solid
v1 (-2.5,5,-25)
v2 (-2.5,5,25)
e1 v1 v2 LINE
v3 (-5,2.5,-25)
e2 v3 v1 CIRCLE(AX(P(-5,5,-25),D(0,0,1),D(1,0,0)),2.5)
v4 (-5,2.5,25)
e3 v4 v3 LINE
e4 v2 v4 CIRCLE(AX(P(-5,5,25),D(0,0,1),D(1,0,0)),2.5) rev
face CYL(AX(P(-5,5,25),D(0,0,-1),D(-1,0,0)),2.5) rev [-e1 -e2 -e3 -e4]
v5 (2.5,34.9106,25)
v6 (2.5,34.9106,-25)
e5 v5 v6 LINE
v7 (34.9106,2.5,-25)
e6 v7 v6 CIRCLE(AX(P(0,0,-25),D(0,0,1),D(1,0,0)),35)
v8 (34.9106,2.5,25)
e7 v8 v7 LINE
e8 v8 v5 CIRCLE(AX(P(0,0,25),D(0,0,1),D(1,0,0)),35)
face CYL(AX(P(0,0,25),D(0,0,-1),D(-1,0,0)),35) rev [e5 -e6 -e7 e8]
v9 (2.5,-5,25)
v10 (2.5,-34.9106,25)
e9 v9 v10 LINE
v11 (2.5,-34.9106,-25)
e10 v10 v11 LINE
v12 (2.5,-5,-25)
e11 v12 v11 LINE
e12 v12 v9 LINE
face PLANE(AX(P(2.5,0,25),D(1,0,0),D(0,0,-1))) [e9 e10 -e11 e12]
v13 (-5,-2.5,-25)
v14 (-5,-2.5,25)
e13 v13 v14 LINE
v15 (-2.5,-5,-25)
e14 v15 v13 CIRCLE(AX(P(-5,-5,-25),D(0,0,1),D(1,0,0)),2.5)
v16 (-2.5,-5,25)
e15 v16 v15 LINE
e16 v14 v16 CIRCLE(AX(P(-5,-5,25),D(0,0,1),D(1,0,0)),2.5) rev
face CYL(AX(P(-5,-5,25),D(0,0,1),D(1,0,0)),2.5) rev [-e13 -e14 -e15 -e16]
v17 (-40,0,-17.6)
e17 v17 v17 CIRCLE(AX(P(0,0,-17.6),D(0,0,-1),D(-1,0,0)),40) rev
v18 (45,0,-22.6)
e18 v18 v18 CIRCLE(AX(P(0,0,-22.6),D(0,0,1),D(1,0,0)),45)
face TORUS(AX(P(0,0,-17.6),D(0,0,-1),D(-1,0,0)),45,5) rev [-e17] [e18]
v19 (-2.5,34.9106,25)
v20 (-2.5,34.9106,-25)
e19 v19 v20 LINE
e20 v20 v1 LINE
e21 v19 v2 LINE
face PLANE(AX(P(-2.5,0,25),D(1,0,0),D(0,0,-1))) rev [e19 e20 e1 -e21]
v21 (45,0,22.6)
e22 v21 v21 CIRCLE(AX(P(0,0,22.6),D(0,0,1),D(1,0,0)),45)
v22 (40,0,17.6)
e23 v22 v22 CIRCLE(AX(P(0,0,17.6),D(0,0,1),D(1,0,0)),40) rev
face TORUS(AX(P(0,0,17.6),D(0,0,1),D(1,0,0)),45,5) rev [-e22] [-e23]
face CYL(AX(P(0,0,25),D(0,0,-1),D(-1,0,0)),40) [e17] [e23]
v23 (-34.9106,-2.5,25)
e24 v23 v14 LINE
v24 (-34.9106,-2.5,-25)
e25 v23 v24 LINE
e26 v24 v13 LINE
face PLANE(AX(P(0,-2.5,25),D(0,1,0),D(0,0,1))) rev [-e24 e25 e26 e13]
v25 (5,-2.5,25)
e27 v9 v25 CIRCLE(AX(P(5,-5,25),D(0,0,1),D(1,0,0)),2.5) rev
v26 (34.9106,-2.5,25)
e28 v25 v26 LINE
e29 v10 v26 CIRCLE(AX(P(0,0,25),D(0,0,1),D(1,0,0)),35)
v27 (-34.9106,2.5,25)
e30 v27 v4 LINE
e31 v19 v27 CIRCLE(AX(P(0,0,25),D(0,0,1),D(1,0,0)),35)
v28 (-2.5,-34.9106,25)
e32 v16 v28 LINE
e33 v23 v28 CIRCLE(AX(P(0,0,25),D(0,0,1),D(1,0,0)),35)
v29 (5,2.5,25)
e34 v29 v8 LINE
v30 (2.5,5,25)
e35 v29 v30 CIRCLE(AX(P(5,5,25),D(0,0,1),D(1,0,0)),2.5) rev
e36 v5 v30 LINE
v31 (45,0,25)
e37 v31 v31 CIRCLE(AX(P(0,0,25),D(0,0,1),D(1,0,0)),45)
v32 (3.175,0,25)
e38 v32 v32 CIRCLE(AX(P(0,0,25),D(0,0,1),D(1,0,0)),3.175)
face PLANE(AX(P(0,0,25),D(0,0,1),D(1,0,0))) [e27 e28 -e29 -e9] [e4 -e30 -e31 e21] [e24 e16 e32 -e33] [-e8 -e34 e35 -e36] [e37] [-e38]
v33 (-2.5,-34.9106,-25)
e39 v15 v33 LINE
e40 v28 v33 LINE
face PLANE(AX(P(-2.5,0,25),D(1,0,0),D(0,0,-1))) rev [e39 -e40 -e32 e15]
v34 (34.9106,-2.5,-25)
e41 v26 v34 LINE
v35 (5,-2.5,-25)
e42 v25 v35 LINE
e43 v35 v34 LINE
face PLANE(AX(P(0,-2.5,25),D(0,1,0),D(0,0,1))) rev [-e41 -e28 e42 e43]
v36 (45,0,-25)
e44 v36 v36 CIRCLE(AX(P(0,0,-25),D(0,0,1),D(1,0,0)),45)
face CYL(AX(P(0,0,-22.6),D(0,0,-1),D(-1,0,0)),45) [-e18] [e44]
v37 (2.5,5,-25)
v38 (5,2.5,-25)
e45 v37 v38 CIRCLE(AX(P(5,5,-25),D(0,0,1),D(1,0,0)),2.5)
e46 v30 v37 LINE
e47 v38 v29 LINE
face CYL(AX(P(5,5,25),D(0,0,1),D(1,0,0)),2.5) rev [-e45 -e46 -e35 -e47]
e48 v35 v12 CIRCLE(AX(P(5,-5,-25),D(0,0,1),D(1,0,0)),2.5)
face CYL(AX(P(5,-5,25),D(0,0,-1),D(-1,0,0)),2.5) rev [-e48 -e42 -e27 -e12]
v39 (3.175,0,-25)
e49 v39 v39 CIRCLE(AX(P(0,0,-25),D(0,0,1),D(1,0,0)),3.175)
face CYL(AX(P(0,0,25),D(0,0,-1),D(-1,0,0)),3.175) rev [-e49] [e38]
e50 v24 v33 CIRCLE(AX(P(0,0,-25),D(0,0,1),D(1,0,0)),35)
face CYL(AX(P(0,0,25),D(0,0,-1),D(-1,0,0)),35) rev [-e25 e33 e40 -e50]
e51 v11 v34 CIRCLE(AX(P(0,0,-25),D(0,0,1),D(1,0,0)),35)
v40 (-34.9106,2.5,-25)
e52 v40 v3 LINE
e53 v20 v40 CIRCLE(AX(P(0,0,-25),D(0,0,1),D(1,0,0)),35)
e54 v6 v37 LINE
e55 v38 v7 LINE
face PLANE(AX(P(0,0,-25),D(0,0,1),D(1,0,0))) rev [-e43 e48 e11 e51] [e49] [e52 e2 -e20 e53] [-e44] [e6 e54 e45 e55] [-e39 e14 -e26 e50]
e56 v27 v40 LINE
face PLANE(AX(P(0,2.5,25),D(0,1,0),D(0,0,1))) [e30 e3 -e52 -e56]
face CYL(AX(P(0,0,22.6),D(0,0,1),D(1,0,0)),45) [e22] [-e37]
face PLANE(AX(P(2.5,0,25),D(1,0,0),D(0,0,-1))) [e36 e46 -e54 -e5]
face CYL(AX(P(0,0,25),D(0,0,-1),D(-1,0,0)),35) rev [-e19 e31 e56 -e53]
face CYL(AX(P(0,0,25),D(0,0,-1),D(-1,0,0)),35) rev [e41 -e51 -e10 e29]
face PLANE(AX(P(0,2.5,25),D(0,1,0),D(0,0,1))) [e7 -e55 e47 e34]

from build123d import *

# Parameters (mm, degrees)
BOSS_EXTRUDE6_DEPTH  = 25
SKETCH2_R            = 45
SKETCH2_R_2          = 40
BOSS_EXTRUDE7_DEPTH  = 2.4
FILLET1_R            = 2.5
FILLET2_R            = 5
FILLET2_OF_MIRROR1_R = 5


with BuildPart() as part:
    # Sketch1 → Boss-Extrude6 (new, symmetric)
    with BuildSketch(Plane.XY):
        with BuildLine():
            Line((-34.910600109, -2.5), (-39.921798557, -2.5))
            ThreePointArc((-39.921798557, -2.5), (-28.284271247, -28.284271247), (-2.5, -39.921798557))
            Line((-2.5, -39.921798557), (-2.5, -34.910600109))
            ThreePointArc((-2.5, -34.910600109), (-24.748737342, -24.748737342), (-34.910600109, -2.5))
        make_face()
        with BuildLine():
            Line((-2.5, 34.910600109), (-2.5, 39.921798557))
            ThreePointArc((-2.5, 39.921798557), (-28.284271247, 28.284271247), (-39.921798557, 2.5))
            Line((-39.921798557, 2.5), (-34.910600109, 2.5))
            ThreePointArc((-34.910600109, 2.5), (-24.748737342, 24.748737342), (-2.5, 34.910600109))
        make_face()
        with BuildLine():
            Line((-34.910600109, 2.5), (-39.921798557, 2.5))
            Line((-39.921798557, 2.5), (-39.921798557, -2.5))
            Line((-39.921798557, -2.5), (-34.910600109, -2.5))
            ThreePointArc((-34.910600109, -2.5), (-35, 0), (-34.910600109, 2.5))
        make_face()
        with BuildLine():
            Line((-2.5, 1.957198253), (-2.5, 2.5))
            Line((-2.5, 2.5), (-34.910600109, 2.5))
            ThreePointArc((-34.910600109, 2.5), (-35, 0), (-34.910600109, -2.5))
            Line((-34.910600109, -2.5), (-2.5, -2.5))
            Line((-2.5, -2.5), (-2.5, -1.957198253))
            ThreePointArc((-2.5, -1.957198253), (-3.175, 0), (-2.5, 1.957198253))
        make_face()
        with BuildLine():
            Line((2.5, 39.921798557), (-2.5, 39.921798557))
            Line((-2.5, 39.921798557), (-2.5, 34.910600109))
            ThreePointArc((-2.5, 34.910600109), (0, 35), (2.5, 34.910600109))
            Line((2.5, 34.910600109), (2.5, 39.921798557))
        make_face()
        with BuildLine():
            ThreePointArc((2.5, 34.910600109), (0, 35), (-2.5, 34.910600109))
            Line((-2.5, 34.910600109), (-2.5, 2.5))
            Line((-2.5, 2.5), (-1.957198253, 2.5))
            ThreePointArc((-1.957198253, 2.5), (0, 3.175), (1.957198253, 2.5))
            Line((1.957198253, 2.5), (2.5, 2.5))
            Line((2.5, 2.5), (2.5, 34.910600109))
        make_face()
        with BuildLine():
            ThreePointArc((39.921798557, 2.5), (28.284271247, 28.284271247), (2.5, 39.921798557))
            Line((2.5, 39.921798557), (2.5, 34.910600109))
            ThreePointArc((2.5, 34.910600109), (24.748737342, 24.748737342), (34.910600109, 2.5))
            Line((34.910600109, 2.5), (39.921798557, 2.5))
        make_face()
        with BuildLine():
            Line((39.921798557, -2.5), (39.921798557, 2.5))
            Line((39.921798557, 2.5), (34.910600109, 2.5))
            ThreePointArc((34.910600109, 2.5), (34.977642887, 1.250798979), (35, 0))
            ThreePointArc((35, 0), (34.977642887, -1.250798979), (34.910600109, -2.5))
            Line((34.910600109, -2.5), (39.921798557, -2.5))
        make_face()
        with BuildLine():
            ThreePointArc((2.5, -39.921798557), (28.284271247, -28.284271247), (39.921798557, -2.5))
            Line((39.921798557, -2.5), (34.910600109, -2.5))
            ThreePointArc((34.910600109, -2.5), (24.748737342, -24.748737342), (2.5, -34.910600109))
            Line((2.5, -34.910600109), (2.5, -39.921798557))
        make_face()
        with BuildLine():
            Line((34.910600109, 2.5), (2.5, 2.5))
            Line((2.5, 2.5), (2.5, 1.957198253))
            ThreePointArc((2.5, 1.957198253), (3.001510037, 1.035163031), (3.175, 0))
            ThreePointArc((3.175, 0), (3.001510037, -1.035163031), (2.5, -1.957198253))
            Line((2.5, -1.957198253), (2.5, -2.5))
            Line((2.5, -2.5), (34.910600109, -2.5))
            ThreePointArc((34.910600109, -2.5), (34.977642887, -1.250798979), (35, 0))
            ThreePointArc((35, 0), (34.977642887, 1.250798979), (34.910600109, 2.5))
        make_face()
        with BuildLine():
            Line((-1.957198253, -2.5), (-2.5, -2.5))
            Line((-2.5, -2.5), (-2.5, -34.910600109))
            ThreePointArc((-2.5, -34.910600109), (0, -35), (2.5, -34.910600109))
            Line((2.5, -34.910600109), (2.5, -2.5))
            Line((2.5, -2.5), (1.957198253, -2.5))
            ThreePointArc((1.957198253, -2.5), (0, -3.175), (-1.957198253, -2.5))
        make_face()
        with BuildLine():
            Line((-2.5, -34.910600109), (-2.5, -39.921798557))
            Line((-2.5, -39.921798557), (2.5, -39.921798557))
            Line((2.5, -39.921798557), (2.5, -34.910600109))
            ThreePointArc((2.5, -34.910600109), (0, -35), (-2.5, -34.910600109))
        make_face()
        with BuildLine():
            Line((-39.921798557, -2.5), (-39.921798557, 2.5))
            ThreePointArc((-39.921798557, 2.5), (-40, 0), (-39.921798557, -2.5))
        make_face()
        with BuildLine():
            Line((2.5, -39.921798557), (-2.5, -39.921798557))
            ThreePointArc((-2.5, -39.921798557), (0, -40), (2.5, -39.921798557))
        make_face()
        with BuildLine():
            ThreePointArc((40, 0), (39.980444859, 1.250611397), (39.921798557, 2.5))
            Line((39.921798557, 2.5), (39.921798557, -2.5))
            ThreePointArc((39.921798557, -2.5), (39.980444859, -1.250611397), (40, 0))
        make_face()
        with BuildLine():
            ThreePointArc((2.5, 39.921798557), (0, 40), (-2.5, 39.921798557))
            Line((-2.5, 39.921798557), (2.5, 39.921798557))
        make_face()
        with BuildLine():
            Line((-1.957198253, 2.5), (-2.5, 2.5))
            Line((-2.5, 2.5), (-2.5, 1.957198253))
            ThreePointArc((-2.5, 1.957198253), (-2.24506403, 2.24506403), (-1.957198253, 2.5))
        make_face()
        with BuildLine():
            Line((2.5, 1.957198253), (2.5, 2.5))
            Line((2.5, 2.5), (1.957198253, 2.5))
            ThreePointArc((1.957198253, 2.5), (2.24506403, 2.24506403), (2.5, 1.957198253))
        make_face()
        with BuildLine():
            Line((2.5, -2.5), (2.5, -1.957198253))
            ThreePointArc((2.5, -1.957198253), (2.24506403, -2.24506403), (1.957198253, -2.5))
            Line((1.957198253, -2.5), (2.5, -2.5))
        make_face()
        with BuildLine():
            ThreePointArc((-1.957198253, -2.5), (-2.24506403, -2.24506403), (-2.5, -1.957198253))
            Line((-2.5, -1.957198253), (-2.5, -2.5))
            Line((-2.5, -2.5), (-1.957198253, -2.5))
        make_face()
    extrude(amount=BOSS_EXTRUDE6_DEPTH, both=True)

    # Sketch2 → Boss-Extrude7 (add)
    with BuildSketch(Plane.XY.offset(25)):
        Circle(SKETCH2_R)
        Circle(SKETCH2_R_2, mode=Mode.SUBTRACT)
    boss_extrude7 = extrude(amount=-BOSS_EXTRUDE7_DEPTH)

    # Fillet1
    fillet1_edges = [part.edges().sort_by_distance(p)[0] for p in [
        (-2.5, -2.5, 0),
        (2.5, -2.5, 0),
        (-2.5, 2.5, 0),
        (2.5, 2.5, 0),
    ]]
    fillet(fillet1_edges, radius=FILLET1_R)

    # Fillet2
    fillet2_edges = [part.edges().sort_by_distance(p)[0] for p in [
        (-2.5, -39.921798557, 22.6),
    ]]
    fillet(fillet2_edges, radius=FILLET2_R - 0.0001)  # a hair under: the kernel refuses the full size

    # Mirror1: Boss-Extrude7 across plane
    add(boss_extrude7.mirror(Plane.XY))

    # Fillet2 of Mirror1
    fillet2_of_mirror1_edges = [part.edges().sort_by_distance(p)[0] for p in [
        (-2.5, -39.921798557, -22.6),
    ]]
    fillet(fillet2_of_mirror1_edges, radius=FILLET2_OF_MIRROR1_R - 0.0001)  # a hair under: the kernel refuses the full size


solid = part.part
